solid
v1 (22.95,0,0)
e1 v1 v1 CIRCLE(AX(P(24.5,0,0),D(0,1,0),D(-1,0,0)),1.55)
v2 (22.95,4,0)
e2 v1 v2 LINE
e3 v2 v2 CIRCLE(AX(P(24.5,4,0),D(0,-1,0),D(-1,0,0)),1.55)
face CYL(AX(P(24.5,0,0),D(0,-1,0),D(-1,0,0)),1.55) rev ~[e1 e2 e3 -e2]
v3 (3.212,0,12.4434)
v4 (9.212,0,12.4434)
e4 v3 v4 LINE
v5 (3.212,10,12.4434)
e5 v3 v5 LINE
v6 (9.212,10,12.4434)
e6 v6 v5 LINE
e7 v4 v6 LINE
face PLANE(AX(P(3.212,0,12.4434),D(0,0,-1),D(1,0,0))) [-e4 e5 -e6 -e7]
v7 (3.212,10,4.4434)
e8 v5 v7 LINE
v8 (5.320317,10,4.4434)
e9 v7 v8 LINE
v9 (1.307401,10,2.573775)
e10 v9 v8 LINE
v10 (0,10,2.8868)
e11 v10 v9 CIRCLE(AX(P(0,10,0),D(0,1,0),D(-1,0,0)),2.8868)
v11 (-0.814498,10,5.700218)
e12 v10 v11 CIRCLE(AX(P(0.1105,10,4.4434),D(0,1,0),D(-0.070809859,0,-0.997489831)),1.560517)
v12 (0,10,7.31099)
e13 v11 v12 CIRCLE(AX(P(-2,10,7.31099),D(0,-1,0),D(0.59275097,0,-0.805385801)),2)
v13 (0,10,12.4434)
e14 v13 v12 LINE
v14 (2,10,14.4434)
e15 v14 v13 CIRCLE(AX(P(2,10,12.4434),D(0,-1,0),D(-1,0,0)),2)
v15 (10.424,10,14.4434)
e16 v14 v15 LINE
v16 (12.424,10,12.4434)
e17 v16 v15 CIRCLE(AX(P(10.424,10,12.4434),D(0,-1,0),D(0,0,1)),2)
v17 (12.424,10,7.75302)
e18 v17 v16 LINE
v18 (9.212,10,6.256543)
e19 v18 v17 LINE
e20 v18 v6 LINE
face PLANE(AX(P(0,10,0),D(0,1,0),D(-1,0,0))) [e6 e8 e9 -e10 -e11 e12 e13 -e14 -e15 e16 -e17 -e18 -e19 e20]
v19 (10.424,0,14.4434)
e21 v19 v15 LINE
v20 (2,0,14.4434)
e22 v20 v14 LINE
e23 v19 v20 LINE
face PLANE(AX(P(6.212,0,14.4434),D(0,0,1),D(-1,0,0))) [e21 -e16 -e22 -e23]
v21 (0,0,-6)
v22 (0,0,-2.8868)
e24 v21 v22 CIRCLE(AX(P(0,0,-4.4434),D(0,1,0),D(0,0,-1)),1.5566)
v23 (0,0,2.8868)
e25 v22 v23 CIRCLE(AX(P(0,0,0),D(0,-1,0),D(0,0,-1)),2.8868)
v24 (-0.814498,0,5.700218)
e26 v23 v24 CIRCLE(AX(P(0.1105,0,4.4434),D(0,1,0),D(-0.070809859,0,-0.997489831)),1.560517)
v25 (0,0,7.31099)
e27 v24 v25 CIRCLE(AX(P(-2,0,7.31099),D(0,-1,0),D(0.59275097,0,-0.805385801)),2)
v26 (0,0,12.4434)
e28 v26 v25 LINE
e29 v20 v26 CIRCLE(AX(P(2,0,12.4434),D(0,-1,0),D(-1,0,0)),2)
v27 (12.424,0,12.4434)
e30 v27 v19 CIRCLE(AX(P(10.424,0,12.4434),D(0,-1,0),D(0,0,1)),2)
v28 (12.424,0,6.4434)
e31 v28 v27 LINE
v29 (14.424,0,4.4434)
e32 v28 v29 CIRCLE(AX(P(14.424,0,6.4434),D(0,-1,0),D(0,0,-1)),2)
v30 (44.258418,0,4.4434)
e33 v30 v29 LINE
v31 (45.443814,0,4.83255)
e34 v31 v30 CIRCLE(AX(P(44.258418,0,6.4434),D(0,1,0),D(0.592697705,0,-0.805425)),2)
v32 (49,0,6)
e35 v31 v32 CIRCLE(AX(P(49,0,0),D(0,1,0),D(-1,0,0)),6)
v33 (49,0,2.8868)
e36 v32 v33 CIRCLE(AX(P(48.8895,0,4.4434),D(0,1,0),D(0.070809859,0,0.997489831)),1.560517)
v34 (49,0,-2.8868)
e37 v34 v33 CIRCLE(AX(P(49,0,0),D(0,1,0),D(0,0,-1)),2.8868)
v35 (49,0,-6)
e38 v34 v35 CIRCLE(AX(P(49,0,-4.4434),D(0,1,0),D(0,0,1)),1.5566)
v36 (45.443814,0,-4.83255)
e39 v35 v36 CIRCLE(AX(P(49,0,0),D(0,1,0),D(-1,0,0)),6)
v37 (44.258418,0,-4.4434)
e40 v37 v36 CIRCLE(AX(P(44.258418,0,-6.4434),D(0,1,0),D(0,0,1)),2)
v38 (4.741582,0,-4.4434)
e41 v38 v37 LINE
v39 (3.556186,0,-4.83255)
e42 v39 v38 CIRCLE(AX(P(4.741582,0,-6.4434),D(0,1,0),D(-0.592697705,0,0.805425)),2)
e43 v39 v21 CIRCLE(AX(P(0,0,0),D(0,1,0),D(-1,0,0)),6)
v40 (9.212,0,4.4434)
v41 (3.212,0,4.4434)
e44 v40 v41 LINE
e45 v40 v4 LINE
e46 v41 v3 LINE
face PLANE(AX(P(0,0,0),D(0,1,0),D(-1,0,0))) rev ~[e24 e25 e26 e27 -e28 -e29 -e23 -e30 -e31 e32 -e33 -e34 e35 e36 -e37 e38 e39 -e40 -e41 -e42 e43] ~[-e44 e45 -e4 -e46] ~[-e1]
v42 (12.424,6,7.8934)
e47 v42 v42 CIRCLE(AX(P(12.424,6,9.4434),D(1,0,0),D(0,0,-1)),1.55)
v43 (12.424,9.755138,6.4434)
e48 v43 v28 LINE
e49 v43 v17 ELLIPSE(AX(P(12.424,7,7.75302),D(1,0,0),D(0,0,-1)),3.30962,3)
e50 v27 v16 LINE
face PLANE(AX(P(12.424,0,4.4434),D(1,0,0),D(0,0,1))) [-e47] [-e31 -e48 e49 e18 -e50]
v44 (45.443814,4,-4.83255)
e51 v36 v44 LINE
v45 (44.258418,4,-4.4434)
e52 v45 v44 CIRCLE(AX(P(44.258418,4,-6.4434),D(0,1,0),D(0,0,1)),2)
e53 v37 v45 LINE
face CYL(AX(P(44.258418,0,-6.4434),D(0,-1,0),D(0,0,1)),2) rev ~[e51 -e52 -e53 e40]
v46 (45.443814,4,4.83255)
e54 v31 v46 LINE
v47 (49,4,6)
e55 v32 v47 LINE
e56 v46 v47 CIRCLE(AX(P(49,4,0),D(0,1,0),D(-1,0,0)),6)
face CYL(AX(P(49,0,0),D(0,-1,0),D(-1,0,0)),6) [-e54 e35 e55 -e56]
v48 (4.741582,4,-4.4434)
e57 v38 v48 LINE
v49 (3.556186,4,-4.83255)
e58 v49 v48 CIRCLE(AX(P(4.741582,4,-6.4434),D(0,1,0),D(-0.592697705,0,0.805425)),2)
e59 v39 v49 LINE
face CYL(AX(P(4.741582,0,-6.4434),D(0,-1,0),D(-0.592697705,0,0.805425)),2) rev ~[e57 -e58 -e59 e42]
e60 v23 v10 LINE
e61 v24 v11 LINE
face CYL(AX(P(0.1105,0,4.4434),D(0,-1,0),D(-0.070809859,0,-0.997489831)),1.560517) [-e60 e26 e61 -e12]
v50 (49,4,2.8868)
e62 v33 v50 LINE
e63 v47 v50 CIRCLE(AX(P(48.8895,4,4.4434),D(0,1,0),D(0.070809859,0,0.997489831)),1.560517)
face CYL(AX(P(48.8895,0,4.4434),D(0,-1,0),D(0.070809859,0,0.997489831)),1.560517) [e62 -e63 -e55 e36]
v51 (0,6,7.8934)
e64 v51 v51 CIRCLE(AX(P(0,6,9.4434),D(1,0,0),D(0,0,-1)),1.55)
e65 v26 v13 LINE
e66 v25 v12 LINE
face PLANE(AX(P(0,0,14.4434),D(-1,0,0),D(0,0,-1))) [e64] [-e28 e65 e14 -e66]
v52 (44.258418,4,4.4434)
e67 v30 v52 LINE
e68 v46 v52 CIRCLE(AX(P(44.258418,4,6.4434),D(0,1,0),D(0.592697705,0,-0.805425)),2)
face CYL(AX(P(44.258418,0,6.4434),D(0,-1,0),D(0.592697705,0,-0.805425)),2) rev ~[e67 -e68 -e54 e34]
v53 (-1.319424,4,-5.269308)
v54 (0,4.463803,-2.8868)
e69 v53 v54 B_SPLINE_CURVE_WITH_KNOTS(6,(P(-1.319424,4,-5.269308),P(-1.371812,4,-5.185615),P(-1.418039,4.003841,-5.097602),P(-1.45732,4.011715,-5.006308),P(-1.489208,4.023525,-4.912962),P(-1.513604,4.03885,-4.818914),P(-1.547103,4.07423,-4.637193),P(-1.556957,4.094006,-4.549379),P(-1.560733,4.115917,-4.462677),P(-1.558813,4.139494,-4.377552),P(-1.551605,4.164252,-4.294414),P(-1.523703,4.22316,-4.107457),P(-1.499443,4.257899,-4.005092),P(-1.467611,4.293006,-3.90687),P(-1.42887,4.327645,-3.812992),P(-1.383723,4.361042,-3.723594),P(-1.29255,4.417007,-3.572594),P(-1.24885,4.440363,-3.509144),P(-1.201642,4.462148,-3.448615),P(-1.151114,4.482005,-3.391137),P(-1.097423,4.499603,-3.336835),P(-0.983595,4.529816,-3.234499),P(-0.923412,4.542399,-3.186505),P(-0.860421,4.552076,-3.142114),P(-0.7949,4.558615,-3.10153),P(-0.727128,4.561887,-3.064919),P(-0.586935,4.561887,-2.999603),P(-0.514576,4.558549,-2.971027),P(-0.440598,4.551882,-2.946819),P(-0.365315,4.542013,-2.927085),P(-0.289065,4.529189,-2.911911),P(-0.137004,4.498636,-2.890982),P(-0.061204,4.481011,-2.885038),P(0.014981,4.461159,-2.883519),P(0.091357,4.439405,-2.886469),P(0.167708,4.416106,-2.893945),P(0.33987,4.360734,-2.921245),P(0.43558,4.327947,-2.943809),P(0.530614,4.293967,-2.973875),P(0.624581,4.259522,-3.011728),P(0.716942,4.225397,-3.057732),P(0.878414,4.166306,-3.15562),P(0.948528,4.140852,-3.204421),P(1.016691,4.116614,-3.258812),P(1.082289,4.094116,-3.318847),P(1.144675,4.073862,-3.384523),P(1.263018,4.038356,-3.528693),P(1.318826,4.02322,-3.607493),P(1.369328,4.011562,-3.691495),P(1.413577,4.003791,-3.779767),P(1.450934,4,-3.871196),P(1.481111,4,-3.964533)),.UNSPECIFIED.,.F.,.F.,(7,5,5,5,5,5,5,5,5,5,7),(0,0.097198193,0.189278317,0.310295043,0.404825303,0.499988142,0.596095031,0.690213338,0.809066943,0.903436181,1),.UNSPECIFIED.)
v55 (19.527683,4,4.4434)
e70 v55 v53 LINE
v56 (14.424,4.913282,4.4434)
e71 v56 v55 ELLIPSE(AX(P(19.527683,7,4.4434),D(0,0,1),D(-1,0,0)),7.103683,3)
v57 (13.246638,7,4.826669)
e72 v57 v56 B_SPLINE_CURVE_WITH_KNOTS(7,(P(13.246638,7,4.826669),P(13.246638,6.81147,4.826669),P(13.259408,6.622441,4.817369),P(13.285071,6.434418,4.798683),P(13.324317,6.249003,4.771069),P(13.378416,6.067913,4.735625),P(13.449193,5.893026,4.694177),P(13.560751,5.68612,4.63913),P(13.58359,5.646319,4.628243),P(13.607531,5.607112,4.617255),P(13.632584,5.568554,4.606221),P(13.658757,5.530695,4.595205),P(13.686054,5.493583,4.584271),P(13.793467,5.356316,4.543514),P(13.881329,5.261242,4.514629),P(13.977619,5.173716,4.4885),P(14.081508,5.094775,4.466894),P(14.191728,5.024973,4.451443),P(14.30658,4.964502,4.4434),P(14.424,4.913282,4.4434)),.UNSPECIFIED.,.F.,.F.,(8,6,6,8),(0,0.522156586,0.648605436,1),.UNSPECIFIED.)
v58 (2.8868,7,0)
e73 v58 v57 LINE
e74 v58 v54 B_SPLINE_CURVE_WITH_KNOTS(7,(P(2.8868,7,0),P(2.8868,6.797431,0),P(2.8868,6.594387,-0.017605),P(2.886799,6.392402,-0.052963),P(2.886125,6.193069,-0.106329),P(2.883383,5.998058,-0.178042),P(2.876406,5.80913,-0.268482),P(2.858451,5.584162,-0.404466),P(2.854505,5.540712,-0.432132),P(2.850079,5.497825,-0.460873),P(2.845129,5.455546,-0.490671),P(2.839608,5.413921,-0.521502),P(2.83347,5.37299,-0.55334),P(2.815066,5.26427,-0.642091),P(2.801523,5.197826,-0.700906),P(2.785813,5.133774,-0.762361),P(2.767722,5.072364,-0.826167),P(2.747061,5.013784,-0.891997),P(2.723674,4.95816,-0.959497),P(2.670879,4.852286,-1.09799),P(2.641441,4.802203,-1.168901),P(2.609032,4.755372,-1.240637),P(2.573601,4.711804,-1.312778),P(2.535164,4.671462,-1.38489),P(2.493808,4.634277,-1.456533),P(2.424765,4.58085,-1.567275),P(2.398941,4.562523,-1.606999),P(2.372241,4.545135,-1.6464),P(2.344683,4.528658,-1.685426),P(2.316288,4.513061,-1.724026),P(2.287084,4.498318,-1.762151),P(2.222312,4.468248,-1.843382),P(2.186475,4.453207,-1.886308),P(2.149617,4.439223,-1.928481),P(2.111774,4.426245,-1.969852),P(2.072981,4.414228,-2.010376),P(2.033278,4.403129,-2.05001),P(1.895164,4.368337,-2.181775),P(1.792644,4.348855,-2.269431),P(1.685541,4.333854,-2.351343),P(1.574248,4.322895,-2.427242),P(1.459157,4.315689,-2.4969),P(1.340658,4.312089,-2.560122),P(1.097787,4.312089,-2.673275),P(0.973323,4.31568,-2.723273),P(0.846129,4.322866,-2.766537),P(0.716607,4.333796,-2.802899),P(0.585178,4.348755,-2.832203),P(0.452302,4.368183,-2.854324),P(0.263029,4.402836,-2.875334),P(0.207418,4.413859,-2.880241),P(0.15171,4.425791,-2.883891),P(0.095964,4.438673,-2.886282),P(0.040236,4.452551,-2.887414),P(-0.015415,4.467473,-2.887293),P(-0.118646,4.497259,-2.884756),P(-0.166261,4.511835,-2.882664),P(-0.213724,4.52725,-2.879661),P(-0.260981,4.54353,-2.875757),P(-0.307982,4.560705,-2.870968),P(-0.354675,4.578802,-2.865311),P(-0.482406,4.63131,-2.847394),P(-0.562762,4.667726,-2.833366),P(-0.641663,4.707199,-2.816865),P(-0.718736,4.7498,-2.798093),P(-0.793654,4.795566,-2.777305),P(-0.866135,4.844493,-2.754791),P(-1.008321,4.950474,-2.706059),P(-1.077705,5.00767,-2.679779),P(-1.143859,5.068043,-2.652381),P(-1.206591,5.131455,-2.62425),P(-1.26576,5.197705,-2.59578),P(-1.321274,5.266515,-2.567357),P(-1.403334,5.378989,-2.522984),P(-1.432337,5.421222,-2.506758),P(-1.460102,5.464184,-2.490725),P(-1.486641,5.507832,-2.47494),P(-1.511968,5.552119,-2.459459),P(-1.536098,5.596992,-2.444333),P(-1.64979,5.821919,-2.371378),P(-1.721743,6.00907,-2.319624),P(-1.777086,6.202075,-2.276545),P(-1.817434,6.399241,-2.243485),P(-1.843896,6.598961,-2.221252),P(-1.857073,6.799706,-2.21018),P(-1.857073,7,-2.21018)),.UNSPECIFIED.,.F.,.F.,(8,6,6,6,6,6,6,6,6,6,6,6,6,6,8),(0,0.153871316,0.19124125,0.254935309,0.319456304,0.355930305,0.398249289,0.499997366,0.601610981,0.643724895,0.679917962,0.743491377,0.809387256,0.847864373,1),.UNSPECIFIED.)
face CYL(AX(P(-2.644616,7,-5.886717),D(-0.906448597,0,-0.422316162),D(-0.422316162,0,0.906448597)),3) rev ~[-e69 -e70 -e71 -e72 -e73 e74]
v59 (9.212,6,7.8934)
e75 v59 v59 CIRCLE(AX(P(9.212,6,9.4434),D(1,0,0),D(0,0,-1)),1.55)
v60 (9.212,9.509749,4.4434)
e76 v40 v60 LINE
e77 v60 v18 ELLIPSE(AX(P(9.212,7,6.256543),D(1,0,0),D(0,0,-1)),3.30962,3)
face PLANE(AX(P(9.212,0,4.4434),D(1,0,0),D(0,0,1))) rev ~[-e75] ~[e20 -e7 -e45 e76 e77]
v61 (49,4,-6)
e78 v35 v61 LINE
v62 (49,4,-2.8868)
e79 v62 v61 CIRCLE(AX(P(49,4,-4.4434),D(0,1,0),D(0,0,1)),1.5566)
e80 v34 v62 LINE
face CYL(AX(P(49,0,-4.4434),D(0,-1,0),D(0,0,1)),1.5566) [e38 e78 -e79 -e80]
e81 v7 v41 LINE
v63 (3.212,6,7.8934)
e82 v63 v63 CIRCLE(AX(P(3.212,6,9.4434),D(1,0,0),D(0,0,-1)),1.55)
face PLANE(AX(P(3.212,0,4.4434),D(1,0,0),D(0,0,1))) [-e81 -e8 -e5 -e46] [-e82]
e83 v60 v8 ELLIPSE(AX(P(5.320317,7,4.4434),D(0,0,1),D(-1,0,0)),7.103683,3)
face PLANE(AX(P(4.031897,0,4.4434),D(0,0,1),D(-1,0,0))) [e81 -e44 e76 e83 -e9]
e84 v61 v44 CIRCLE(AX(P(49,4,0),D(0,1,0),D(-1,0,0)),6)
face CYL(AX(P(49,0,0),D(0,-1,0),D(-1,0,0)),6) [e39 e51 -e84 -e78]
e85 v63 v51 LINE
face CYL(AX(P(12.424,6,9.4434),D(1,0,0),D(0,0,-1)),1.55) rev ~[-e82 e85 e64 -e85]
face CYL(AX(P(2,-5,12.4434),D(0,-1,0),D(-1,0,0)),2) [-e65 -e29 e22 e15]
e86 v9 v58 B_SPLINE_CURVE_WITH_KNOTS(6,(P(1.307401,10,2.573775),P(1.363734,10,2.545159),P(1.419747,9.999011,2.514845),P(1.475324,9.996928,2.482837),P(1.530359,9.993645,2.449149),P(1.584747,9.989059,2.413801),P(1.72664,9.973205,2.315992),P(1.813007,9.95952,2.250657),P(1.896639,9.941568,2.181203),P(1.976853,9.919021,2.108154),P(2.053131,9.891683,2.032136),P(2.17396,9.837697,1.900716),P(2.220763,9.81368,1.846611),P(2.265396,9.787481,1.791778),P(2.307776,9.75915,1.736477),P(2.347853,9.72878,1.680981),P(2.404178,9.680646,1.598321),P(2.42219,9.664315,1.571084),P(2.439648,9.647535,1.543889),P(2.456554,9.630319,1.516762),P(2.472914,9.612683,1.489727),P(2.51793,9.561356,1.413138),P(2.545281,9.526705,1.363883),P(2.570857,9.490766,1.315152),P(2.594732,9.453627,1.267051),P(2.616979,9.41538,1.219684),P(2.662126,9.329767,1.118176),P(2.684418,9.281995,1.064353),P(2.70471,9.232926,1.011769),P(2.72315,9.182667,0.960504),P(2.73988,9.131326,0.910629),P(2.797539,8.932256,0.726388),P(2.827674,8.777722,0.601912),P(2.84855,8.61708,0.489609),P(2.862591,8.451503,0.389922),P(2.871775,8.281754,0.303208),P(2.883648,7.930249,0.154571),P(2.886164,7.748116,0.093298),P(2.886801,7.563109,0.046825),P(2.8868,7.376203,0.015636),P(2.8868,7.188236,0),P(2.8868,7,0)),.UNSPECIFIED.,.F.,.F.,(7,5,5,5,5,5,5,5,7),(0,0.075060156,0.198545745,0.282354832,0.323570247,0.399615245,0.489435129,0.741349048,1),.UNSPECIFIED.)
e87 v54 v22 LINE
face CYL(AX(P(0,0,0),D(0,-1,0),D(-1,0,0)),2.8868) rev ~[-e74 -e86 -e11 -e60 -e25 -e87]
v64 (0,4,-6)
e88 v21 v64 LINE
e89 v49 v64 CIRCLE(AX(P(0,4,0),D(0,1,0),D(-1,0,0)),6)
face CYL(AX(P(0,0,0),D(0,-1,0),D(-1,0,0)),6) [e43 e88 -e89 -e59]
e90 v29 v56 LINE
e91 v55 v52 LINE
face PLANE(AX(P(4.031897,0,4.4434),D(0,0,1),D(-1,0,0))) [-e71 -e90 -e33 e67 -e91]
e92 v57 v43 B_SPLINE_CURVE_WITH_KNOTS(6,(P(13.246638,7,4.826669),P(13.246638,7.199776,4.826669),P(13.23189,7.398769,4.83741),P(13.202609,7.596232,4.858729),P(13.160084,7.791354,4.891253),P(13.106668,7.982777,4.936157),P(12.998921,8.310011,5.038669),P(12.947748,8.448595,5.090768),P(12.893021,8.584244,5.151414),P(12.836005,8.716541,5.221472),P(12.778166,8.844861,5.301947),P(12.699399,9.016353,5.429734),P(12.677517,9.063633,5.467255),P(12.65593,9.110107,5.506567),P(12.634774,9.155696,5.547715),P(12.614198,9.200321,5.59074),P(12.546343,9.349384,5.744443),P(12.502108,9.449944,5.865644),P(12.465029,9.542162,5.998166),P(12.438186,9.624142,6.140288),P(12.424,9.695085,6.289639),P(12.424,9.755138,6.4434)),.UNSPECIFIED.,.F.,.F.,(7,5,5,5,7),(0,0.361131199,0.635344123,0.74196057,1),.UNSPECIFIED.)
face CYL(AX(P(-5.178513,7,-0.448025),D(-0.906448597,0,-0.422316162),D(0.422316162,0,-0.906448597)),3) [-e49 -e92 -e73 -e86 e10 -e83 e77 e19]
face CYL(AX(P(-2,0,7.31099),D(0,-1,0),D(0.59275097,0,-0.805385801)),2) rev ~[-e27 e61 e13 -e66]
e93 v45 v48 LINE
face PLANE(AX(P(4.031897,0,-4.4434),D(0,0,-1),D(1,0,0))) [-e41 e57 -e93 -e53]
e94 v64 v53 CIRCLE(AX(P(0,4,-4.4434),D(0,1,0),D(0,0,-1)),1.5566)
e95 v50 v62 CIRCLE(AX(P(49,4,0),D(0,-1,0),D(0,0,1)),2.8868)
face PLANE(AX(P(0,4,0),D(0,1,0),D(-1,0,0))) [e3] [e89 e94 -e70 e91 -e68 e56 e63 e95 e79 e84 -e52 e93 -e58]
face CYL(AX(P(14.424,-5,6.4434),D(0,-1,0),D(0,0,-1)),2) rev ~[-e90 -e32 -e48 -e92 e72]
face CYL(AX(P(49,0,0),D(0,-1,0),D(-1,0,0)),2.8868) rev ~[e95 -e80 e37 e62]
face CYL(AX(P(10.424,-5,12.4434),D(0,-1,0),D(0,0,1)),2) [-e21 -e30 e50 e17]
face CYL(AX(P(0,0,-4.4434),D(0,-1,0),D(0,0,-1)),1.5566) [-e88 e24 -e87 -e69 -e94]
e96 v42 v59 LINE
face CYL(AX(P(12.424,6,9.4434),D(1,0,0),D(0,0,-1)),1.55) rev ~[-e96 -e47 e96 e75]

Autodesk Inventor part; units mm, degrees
ref_plane "YZ Plane" through (0, 0, 0) normal (1, 0, 0) x (0, 1, 0)
ref_plane "XZ Plane" through (0, 0, 0) normal (0, 1, 0) x (-1, 0, 0)
ref_plane "XY Plane" through (0, 0, 0) normal (0, 0, 1) x (1, 0, 0)
sketch "Sketch1" plane through (0, 0, 0) normal (0, 1, 0) x (-1, 0, 0)
  circle A0 centre (0, 0) radius 2.4868
  line L0 (2.8868, 0) -> (1.4434, 2.5)
  line L1 (1.4434, 2.5) -> (-1.4434, 2.5)
  line L2 (-1.4434, 2.5) -> (-2.8868, 0)
  line L3 (-2.8868, 0) -> (-1.4434, -2.5)
  line L4 (-1.4434, -2.5) -> (1.4434, -2.5)
  line L5 (1.4434, -2.5) -> (2.8868, 0)
  line L6 (0, 0) -> (-23.467, 0)
  circle A1 centre (-49, 0) radius 2.4868
  line L7 (-46.1132, 0) -> (-47.5566, 2.5)
  line L8 (-47.5566, 2.5) -> (-50.4434, 2.5)
  line L9 (-50.4434, 2.5) -> (-51.8868, 0)
  line L10 (-51.8868, 0) -> (-50.4434, -2.5)
  line L11 (-50.4434, -2.5) -> (-47.5566, -2.5)
  line L12 (-47.5566, -2.5) -> (-46.1132, 0)
  arc A2 (43.788, 27) -> (35.788, 35) centre (35.788, 27) ccw
  line L13 (35.788, 35) -> (-48.212, 35)
  arc A3 (-48.212, 35) -> (-56.212, 27) centre (-48.212, 27) ccw
  line L14 (-56.212, 27) -> (-56.212, -62.0882)
  arc A4 (-56.212, -62.0882) -> (-54.3404, -67.2305) centre (-48.212, -62.0882) ccw
  line L15 (-54.3404, -67.2305) -> (-37.6324, -87.1423)
  arc A5 (-37.6324, -87.1423) -> (-31.504, -90) centre (-31.504, -82) ccw
  line L16 (-31.504, -90) -> (19.08, -90)
  arc A6 (19.08, -90) -> (25.2084, -87.1423) centre (19.08, -82) ccw
  line L17 (25.2084, -87.1423) -> (41.9164, -67.2305)
  arc A7 (41.9164, -67.2305) -> (43.788, -62.0882) centre (35.788, -62.0882) ccw
  line L18 (43.788, -62.0882) -> (43.788, 27)
  arc A8 (-17.212, -66) -> (-11.212, -72) centre (-11.212, -66) ccw
  line L19 (-11.212, -72) -> (-1.212, -72)
  arc A9 (-1.212, -72) -> (4.788, -66) centre (-1.212, -66) ccw
  line L20 (4.788, -66) -> (4.788, -64)
  arc A10 (10.788, -58) -> (4.788, -64) centre (10.788, -64) ccw
  line L21 (10.788, -58) -> (25.4731, -58)
  arc A11 (29.3447, -59.4162) -> (25.4731, -58) centre (25.4731, -64) ccw
  line L22 (29.3447, -59.4162) -> (31.3866, -61.1409)
  arc A12 (32.1113, -69.5814) -> (31.3866, -61.1409) centre (27.515, -65.7247) ccw
  line L23 (32.1113, -69.5814) -> (21.8111, -81.8567)
  arc A13 (17.2148, -84) -> (21.8111, -81.8567) centre (17.2148, -78) ccw
  line L24 (17.2148, -84) -> (-29.6388, -84)
  arc A14 (-34.2351, -81.8567) -> (-29.6388, -84) centre (-29.6388, -78) ccw
  line L25 (-34.2351, -81.8567) -> (-44.5353, -69.5814)
  arc A15 (-43.8106, -61.1409) -> (-44.5353, -69.5814) centre (-39.939, -65.7247) ccw
  line L26 (-43.8106, -61.1409) -> (-41.7687, -59.4162)
  arc A16 (-37.8971, -58) -> (-41.7687, -59.4162) centre (-37.8971, -64) ccw
  line L27 (-37.8971, -58) -> (-23.212, -58)
  arc A17 (-17.212, -64) -> (-23.212, -58) centre (-23.212, -64) ccw
  line L28 (-17.212, -64) -> (-17.212, -66)
  circle A18 centre (0, -58) radius 1.375
  circle A19 centre (0, 0) radius 1.5
  circle A20 centre (-49, -58) radius 1.375
  circle A21 centre (-51.962, 9) radius 0.575
  circle A22 centre (39.538, 27) radius 0.575
  circle A23 centre (39.538, 9) radius 0.575
  circle A24 centre (36.576, 0) radius 1.5
  circle A25 centre (36.576, -43.18) radius 1.5
  circle A26 centre (0, -43.18) radius 1.5
  circle A27 centre (-49, 0) radius 1.375
  circle A28 centre (-51.962, 27) radius 0.575
  circle A29 centre (-6.212, -53.538) radius 1.15
  circle A30 centre (-6.212, -67) radius 1.15
  line L29 (35.788, 35) -> (-48.212, 35)
  line L30 (-6.212, 35) -> (-6.212, -103.5846)
  dimension "d2" = 49
sketch "Sketch2" plane through (0, 0, 0) normal (0, 1, 0) x (-1, 0, 0)
  line L0 (-2.8868, 0) -> (-1.4434, -2.5) projected
  line L1 (1.4434, -2.5) -> (2.8868, 0) projected
  circle A0 centre (0, 0) radius 2.8868
  circle A1 centre (0, 0) radius 6
  arc A2 (0, -6) -> (0, -2.8868) centre (0, -4.4434) ccw
  arc A3 (0, 2.8868) -> (0, 6) centre (-0.1105, 4.4434) ccw
  line L2 (0, -4.4434) -> (-24.5, -4.4434)
  line L3 (-24.5, -4.4434) -> (-24.5, 4.4434)
  line L4 (-24.5, 4.4434) -> (0, 4.4434)
  line L5 (0, 4.4434) -> (0, -4.4434)
  line L6 (-46.1132, 0) -> (-47.5566, -2.5)
  line L7 (-50.4434, -2.5) -> (-51.8868, 0)
  circle A4 centre (-49, 0) radius 2.8868
  circle A5 centre (-49, 0) radius 6
  arc A6 (-49, -2.8868) -> (-49, -6) centre (-49, -4.4434) ccw
  arc A7 (-49, 6) -> (-49, 2.8868) centre (-48.8895, 4.4434) ccw
  line L8 (-49, -4.4434) -> (-24.5, -4.4434)
  line L9 (-24.5, 4.4434) -> (-49, 4.4434)
  line L10 (-49, 4.4434) -> (-49, -4.4434)
  circle A8 centre (-24.5, 0) radius 1.55
  line L11 (-6.212, 35) -> (-6.212, -103.5846) projected
  line L12 (0, 4.4434) -> (-12.424, 4.4434)
  line L13 (-12.424, 4.4434) -> (-12.424, 14.4434)
  line L14 (-12.424, 14.4434) -> (0, 14.4434)
  line L15 (0, 14.4434) -> (0, 4.4434)
  line L16 (-12.424, 4.4434) -> (-2.8868, 4.4434)
  line L17 (-2.8868, 4.4434) -> (-2.8868, 0)
  line L18 (-2.8868, 0) -> (-12.424, 0)
  line L19 (-12.424, 0) -> (-12.424, 4.4434)
  line L20 (-6.212, 4.4434) -> (-3.212, 4.4434)
  line L21 (-3.212, 4.4434) -> (-3.212, 12.4434)
  line L22 (-3.212, 12.4434) -> (-6.212, 12.4434)
  line L23 (-6.212, 12.4434) -> (-6.212, 4.4434)
  line L24 (-6.212, 4.4434) -> (-9.212, 4.4434)
  line L25 (-9.212, 4.4434) -> (-9.212, 12.4434)
  line L26 (-9.212, 12.4434) -> (-6.212, 12.4434)
  line L27 (-12.424, 4.4434) -> (-2.8868, 0)
  point P0 (0, 0)
  point P1 (-4.0319, -4.4434)
  point P2 (-4.0319, 4.4434)
  point P3 (-44.9681, 4.4434)
  point P4 (-44.9681, -4.4434)
  point P5 (0, 6)
  point P6 (0, 6)
  point P7 (-9.5372, 4.4434)
  point P8 (-3.212, 5.0678)
  dimension "d7" = 12
  dimension "d9" = 3.1
  dimension "d14" = 12.424
  dimension "d15" = 10
  dimension "d16" = 6.212
  dimension "d24" = 3
  dimension "d25" = 8
extrude "Extrusion1" add sketch "Sketch2" along normal blind 4 contours L17 L4 L5 A0 | L27 A1 L4 L17 | A0 L5 L2 A1 L18 | L18 A1 L27 | L5 L15 A3 | L4 L21 A1 L15 | L18 L11 L27 A1 | A1 L2 L11 L18 | L27 L11 L4 A1 | A2 A1 L2 L5 | L18 L19 L27 L11 | L11 L2 L3 A8 L4 L19 L18 | L27 L4 L11 | L8 A5 L9 L3 A8 | L8 L10 A4 L9 A5 | A5 A6 L10 L8 | L9 L10 A7 A5
extrude "Extrusion3" add sketch "Sketch2" along normal blind 10 contours L17 L4 L5 A0 | L27 A1 L4 L17 | L5 L15 A3 | L4 L21 A1 L15 | L27 L11 L4 A1 | A1 L21 L22 L11 L14 L15 | L27 L4 L11 | L13 L14 L11 L26 L25 L4
sketch "Sketch4" plane through (12.424, 0, 14.4434) normal (1, 0, 0) x (0, 0, -1)
  line L0 (2, 0) -> (2, 10) projected
  line L1 (2, 10) -> (10, 10)
  line L2 (10, 10) -> (10, 0)
  line L3 (10, 0) -> (2, 0)
  line L4 (2, 0) -> (2, 10)
  circle A0 centre (5, 6) radius 1.55
  point P0 (14.4434, 0)
  dimension "d26" = 8
  dimension "d27" = 3.1
  dimension "d28" = 4
  dimension "d31" = 3
extrude "Extrusion4" cut sketch "Sketch4" against normal up to surface (12.424 mm away) contours A0
fillet "Fillet3" radius 3 2 edges at (7.6554, 4, 2.2217) (7.6554, 10, 2.2217)
fillet "Fillet3" radius 2 7 edges at (12.424, 2, 4.4434) (12.424, 5, 14.4434) (0, 5, 14.4434) (44.9681, 2, 4.4434) (44.9681, 2, -4.4434) (4.0319, 2, -4.4434) (0, 5, 6)
equation "\"d14\" = 2 * d16"
equation "\"d24\" = Acrylic"
equation "\"Acrylic\" = 3"
properties part number "BaseMount"
